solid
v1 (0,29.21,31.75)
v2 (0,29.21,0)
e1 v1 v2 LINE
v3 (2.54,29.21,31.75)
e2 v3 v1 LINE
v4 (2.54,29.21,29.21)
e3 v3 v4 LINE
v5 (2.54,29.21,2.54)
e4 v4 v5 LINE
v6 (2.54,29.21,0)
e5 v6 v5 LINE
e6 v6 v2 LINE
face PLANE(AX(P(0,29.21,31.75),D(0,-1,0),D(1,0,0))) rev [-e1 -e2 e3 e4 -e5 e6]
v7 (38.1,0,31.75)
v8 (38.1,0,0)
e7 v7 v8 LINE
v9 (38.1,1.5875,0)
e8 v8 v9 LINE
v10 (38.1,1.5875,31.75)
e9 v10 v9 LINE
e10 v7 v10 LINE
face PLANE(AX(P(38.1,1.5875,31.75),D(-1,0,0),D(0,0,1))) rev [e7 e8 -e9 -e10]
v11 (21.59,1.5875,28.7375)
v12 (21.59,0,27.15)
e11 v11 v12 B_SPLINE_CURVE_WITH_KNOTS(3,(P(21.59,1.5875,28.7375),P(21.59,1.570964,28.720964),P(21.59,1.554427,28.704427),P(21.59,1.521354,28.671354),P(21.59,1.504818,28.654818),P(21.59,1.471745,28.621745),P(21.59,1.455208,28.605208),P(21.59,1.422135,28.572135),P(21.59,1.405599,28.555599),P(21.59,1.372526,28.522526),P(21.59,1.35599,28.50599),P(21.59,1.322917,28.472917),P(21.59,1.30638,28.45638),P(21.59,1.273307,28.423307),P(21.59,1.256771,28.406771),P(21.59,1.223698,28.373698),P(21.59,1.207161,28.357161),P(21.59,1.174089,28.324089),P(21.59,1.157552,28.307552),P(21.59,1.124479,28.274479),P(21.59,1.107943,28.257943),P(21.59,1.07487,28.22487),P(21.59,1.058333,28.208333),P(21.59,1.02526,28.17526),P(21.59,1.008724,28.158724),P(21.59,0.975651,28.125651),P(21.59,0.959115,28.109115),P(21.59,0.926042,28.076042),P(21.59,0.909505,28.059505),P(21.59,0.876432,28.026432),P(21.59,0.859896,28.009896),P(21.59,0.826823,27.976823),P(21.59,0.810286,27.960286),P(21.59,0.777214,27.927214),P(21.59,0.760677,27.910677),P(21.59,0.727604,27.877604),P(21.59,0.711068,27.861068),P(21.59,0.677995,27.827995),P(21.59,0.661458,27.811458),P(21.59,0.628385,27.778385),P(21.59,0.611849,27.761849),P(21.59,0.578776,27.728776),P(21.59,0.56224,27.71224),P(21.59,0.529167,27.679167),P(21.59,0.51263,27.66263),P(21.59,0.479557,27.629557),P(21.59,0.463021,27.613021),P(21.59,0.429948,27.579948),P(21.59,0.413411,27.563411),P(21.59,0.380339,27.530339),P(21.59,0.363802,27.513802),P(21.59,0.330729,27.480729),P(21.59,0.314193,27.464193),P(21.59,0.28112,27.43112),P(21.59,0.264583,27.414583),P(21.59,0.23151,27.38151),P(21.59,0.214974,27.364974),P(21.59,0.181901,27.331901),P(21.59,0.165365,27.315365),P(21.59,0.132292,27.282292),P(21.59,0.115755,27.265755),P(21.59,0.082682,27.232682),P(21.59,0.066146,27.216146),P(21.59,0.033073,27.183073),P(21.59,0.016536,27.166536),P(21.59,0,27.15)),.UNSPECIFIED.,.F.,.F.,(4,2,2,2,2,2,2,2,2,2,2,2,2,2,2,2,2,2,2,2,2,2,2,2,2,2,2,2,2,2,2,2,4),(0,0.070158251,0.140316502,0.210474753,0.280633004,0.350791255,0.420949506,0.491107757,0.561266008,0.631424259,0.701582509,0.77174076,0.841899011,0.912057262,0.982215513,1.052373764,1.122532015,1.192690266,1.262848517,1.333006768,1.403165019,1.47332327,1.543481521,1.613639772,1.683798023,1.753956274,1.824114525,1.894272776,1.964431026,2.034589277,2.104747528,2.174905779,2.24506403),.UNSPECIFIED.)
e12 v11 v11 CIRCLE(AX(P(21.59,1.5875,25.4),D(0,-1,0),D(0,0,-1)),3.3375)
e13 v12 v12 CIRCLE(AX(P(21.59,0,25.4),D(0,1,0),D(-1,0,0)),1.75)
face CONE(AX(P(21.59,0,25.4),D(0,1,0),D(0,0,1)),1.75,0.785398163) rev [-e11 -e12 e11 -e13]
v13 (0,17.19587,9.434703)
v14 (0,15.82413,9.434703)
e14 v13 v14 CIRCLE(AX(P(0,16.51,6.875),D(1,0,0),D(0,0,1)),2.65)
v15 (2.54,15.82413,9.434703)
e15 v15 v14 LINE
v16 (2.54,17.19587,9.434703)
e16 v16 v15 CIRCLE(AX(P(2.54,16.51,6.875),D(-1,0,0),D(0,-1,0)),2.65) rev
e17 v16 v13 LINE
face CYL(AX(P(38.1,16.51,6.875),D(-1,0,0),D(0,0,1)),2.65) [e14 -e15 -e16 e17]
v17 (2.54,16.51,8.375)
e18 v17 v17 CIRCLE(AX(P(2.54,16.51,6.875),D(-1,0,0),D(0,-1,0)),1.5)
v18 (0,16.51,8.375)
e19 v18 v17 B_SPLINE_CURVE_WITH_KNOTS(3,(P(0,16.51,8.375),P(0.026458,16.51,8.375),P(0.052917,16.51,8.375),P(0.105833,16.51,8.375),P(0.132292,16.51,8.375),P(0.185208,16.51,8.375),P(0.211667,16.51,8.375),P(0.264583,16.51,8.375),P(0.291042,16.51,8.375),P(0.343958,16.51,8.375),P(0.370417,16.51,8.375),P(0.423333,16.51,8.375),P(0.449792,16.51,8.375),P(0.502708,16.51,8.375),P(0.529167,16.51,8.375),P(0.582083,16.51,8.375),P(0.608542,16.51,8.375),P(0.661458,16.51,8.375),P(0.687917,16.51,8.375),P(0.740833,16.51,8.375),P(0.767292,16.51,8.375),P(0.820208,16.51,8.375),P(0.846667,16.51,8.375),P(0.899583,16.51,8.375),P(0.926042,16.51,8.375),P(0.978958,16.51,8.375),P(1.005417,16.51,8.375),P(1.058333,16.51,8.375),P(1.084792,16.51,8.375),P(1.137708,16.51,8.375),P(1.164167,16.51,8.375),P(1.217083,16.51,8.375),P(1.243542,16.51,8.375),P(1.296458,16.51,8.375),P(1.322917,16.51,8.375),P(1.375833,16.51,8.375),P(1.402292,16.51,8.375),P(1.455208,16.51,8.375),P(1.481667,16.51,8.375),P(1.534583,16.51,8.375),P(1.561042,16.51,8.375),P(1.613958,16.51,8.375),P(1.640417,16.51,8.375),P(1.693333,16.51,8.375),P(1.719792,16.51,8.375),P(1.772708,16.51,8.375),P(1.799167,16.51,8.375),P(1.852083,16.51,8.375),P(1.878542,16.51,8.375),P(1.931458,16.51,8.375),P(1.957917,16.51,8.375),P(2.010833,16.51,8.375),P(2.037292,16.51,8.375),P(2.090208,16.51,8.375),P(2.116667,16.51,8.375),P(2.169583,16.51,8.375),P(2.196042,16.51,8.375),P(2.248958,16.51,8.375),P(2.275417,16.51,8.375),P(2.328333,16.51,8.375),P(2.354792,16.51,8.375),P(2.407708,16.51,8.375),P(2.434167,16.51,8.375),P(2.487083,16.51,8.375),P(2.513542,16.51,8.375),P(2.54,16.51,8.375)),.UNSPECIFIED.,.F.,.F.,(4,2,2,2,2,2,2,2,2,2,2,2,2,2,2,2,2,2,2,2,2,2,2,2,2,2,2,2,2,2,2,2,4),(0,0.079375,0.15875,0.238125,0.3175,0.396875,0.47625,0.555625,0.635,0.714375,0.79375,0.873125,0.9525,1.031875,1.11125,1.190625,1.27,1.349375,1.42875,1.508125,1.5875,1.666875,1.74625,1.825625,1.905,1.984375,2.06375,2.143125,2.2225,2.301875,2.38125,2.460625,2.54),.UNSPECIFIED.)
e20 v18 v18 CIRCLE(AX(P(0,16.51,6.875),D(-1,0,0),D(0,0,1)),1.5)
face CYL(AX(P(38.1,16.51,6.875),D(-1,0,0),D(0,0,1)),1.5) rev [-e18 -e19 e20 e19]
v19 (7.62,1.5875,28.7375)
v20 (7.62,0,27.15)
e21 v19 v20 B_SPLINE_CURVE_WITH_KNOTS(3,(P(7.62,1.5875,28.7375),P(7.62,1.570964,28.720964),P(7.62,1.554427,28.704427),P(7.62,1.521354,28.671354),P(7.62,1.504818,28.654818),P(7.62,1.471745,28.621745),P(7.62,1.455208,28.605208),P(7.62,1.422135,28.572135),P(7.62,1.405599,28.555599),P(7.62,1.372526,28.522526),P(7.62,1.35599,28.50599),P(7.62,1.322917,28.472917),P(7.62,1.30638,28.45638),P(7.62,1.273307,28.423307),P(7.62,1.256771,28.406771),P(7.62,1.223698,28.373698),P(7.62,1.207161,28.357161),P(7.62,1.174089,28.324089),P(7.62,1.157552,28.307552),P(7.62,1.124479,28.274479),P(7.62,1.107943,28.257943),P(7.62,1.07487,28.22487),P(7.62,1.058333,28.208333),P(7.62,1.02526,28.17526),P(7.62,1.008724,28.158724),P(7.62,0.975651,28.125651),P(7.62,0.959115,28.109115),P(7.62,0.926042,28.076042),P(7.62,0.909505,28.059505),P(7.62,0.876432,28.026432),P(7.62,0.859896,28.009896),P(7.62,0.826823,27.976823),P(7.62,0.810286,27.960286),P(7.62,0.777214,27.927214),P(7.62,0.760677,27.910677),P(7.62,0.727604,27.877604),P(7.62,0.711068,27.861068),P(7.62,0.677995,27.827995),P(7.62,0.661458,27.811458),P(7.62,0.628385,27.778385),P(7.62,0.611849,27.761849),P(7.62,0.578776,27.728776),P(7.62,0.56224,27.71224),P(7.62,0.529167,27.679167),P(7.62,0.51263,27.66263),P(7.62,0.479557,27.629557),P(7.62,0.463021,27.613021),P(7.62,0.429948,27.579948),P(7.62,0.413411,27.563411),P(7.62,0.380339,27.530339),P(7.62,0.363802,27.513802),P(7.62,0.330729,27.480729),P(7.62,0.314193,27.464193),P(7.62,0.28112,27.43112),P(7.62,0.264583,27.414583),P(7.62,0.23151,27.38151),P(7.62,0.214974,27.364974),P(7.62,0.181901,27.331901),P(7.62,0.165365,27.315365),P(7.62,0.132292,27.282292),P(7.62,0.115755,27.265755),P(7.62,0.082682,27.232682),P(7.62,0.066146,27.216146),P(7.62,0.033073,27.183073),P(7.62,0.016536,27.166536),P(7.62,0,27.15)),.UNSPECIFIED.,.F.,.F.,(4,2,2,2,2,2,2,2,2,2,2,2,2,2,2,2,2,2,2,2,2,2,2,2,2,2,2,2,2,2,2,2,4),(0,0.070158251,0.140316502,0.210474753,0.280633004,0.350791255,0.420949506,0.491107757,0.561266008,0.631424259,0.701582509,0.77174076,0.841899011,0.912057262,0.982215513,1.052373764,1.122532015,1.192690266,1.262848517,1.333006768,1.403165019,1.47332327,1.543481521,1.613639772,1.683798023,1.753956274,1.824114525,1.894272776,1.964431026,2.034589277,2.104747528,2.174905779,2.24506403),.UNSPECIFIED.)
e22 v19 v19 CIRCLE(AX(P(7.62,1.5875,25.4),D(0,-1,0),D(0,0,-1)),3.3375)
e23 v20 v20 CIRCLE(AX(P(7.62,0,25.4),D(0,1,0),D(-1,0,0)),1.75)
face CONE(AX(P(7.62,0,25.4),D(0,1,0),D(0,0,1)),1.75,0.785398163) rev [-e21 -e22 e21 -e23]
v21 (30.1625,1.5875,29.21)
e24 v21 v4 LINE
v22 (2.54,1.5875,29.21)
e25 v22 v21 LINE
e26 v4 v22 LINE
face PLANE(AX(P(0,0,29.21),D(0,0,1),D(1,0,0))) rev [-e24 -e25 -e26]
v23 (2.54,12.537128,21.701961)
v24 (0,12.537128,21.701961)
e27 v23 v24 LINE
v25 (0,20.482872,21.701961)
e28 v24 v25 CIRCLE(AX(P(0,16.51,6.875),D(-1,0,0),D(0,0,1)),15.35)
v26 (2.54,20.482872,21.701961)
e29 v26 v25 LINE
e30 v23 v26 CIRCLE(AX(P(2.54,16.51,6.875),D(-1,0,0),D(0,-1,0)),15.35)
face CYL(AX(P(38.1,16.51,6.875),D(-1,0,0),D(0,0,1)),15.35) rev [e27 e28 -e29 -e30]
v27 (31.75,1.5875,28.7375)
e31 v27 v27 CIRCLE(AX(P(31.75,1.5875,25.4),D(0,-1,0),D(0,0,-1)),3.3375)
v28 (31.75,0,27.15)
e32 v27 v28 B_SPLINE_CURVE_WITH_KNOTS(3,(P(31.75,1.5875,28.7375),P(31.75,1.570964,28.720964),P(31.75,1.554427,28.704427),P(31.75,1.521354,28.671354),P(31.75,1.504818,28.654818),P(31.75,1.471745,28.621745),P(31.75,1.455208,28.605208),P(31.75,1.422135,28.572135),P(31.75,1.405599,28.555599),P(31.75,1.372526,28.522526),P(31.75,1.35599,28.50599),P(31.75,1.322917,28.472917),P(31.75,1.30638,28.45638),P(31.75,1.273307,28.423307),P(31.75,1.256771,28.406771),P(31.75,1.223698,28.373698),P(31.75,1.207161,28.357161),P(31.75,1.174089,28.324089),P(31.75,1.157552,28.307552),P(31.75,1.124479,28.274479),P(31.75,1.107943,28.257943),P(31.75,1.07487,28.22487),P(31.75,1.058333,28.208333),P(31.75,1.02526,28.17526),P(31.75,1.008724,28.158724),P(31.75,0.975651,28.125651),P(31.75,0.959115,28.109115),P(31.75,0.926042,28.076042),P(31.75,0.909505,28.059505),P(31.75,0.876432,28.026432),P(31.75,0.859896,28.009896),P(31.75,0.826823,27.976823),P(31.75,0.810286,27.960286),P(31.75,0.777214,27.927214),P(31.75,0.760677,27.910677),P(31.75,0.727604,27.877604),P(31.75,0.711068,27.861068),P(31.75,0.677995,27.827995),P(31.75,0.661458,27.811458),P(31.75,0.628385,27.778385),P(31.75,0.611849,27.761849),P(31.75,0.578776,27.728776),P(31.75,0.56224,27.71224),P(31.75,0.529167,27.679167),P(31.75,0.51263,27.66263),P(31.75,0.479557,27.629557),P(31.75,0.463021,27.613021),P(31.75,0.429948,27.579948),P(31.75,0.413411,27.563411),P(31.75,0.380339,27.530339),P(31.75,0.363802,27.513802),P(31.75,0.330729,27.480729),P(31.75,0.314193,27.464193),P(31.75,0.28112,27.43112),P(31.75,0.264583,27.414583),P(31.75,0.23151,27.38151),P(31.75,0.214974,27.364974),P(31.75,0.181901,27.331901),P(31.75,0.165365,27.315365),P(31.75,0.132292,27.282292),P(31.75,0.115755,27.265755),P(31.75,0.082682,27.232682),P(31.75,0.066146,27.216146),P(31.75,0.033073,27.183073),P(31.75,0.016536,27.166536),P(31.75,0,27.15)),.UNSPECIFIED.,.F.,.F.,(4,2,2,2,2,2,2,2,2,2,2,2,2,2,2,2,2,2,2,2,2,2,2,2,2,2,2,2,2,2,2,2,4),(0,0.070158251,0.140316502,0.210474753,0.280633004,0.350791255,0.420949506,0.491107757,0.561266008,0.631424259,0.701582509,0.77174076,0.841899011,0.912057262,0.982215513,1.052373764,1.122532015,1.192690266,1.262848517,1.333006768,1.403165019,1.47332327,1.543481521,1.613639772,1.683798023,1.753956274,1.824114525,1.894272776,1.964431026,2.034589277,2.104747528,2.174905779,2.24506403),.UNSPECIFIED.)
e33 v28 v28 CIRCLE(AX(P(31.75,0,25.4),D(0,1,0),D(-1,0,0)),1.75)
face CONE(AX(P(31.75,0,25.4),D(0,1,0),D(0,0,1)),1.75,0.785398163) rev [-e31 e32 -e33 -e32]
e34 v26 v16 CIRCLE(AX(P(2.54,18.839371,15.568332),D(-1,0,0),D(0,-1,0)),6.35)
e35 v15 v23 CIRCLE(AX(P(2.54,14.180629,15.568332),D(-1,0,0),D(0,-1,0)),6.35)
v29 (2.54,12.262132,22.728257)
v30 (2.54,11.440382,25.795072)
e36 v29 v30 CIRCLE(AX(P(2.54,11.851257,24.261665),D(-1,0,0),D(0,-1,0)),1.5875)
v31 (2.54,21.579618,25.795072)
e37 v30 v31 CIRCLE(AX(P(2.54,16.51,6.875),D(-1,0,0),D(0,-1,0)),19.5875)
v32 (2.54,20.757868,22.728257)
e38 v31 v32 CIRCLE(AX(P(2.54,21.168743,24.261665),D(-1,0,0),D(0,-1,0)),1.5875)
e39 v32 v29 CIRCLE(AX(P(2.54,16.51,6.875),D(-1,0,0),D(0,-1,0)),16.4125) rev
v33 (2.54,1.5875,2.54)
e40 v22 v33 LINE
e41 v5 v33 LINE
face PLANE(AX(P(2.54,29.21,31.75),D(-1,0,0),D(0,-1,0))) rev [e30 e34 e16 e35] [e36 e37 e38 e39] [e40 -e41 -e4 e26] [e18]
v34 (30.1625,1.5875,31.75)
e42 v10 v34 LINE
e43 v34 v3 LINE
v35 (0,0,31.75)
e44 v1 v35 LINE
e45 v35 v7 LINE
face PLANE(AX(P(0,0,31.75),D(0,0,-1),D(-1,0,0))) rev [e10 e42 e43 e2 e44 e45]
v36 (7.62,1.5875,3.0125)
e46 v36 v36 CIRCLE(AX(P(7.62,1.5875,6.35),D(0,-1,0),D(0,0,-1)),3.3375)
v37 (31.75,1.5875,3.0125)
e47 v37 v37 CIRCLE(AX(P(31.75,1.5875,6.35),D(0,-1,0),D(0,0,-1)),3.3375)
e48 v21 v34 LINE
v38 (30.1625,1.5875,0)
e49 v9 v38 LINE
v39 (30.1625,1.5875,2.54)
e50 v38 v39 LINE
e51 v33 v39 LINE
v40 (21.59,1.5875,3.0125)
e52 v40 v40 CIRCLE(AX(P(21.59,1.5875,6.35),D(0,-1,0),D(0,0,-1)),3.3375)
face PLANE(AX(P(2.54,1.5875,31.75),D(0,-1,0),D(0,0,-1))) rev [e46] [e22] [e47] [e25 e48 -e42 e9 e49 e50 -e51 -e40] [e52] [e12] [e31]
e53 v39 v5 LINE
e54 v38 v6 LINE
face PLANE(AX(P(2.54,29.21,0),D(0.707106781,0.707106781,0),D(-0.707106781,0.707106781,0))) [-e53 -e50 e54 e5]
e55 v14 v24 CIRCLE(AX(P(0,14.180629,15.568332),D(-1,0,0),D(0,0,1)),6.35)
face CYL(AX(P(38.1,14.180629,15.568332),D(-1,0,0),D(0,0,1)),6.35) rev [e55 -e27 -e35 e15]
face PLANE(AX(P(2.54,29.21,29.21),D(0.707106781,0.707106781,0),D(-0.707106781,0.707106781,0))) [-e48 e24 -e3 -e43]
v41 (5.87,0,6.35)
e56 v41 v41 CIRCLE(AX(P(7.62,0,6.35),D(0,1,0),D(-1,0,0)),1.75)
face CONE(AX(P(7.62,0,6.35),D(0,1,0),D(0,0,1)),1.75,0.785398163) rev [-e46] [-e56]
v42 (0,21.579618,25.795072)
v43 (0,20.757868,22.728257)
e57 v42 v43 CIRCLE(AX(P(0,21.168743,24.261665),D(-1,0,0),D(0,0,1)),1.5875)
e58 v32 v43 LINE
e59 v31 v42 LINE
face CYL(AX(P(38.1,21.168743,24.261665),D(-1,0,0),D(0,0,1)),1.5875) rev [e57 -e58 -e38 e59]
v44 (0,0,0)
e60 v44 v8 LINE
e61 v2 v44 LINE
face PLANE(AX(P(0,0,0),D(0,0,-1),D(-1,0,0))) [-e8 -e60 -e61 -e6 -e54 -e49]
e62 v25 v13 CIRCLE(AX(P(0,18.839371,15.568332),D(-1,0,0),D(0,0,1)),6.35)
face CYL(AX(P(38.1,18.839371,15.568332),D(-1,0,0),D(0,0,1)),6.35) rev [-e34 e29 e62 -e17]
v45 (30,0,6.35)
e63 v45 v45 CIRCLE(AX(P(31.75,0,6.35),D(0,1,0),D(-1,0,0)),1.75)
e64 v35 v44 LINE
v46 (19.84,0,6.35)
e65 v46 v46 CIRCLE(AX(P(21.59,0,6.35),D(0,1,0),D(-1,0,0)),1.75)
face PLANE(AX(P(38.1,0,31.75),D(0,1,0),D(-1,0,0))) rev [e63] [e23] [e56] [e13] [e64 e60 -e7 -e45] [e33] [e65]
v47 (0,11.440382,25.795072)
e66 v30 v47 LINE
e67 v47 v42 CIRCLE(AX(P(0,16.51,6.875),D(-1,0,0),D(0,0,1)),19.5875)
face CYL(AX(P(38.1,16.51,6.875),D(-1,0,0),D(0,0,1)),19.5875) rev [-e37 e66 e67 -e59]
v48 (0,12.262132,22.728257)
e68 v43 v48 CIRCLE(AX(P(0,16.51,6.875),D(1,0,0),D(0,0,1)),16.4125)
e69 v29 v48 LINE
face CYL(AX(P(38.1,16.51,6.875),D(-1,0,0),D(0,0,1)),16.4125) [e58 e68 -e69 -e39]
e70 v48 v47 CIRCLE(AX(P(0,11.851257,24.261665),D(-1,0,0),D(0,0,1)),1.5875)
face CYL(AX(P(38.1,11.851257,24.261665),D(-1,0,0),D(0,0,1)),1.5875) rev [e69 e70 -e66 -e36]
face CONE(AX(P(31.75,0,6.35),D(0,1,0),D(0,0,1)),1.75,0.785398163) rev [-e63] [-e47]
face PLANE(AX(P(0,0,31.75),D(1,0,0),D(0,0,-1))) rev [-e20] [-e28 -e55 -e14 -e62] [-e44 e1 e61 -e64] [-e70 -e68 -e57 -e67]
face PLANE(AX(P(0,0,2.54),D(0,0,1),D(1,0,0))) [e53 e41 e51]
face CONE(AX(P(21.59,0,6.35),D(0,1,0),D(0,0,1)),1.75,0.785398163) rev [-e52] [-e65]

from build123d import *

# Parameters (mm, degrees)
BOSS_EXTRUDE1_DEPTH = 31.75
SKETCH2_R           = 6.35
CUT_EXTRUDE1_DEPTH  = 58.557767504
SKETCH3_R           = 1.5
CUT_EXTRUDE2_DEPTH  = 58.557767504
BOSS_EXTRUDE2_DEPTH = 2.54
BOSS_EXTRUDE3_START = -29.21
BOSS_EXTRUDE3_DEPTH = 2.54
SKETCH5_R           = 1.75
CUT_EXTRUDE3_DEPTH  = 2.54
CHAMFER1_SIZE       = 1.5875


with BuildPart() as part:
    # Sketch1 → Boss-Extrude1 (new body)
    with BuildSketch(Plane.XY):
        Polygon((0, 0), (0, 29.21), (2.54, 29.21), (2.54, 1.5875), (38.1, 1.5875), (38.1, 0), align=None)
    extrude(amount=BOSS_EXTRUDE1_DEPTH)

    # Sketch2 → Cut-Extrude1 (cut, through all)
    with BuildSketch(Plane.ZY):
        with Locations((15.875, 16.51)):
            Circle(SKETCH2_R)
    extrude(amount=-CUT_EXTRUDE1_DEPTH, mode=Mode.SUBTRACT)

    # Sketch3 → Cut-Extrude2 (cut, through all)
    with BuildSketch(Plane.ZY):
        with Locations((6.875, 16.51)):
            Circle(SKETCH3_R)
        with BuildLine():
            ThreePointArc((21.701961434, 12.537127658), (22.225, 16.51), (21.701961434, 20.482872342))
            ThreePointArc((21.701961434, 20.482872342), (13.9248315, 24.973000403), (9.43470344, 17.19587047))
            ThreePointArc((9.43470344, 17.19587047), (9.525, 16.51), (9.43470344, 15.82412953))
            ThreePointArc((9.43470344, 15.82412953), (13.9248315, 8.046999597), (21.701961434, 12.537127658))
        make_face()
        with BuildLine():
            ThreePointArc((25.79507191, 11.440382011), (26.46249978, 16.51), (25.79507191, 21.579617989))
            ThreePointArc((25.79507191, 21.579617989), (23.850789427, 22.702150004), (22.728257411, 20.757867521))
            ThreePointArc((22.728257411, 20.757867521), (23.28749978, 16.51), (22.728257411, 12.262132479))
            ThreePointArc((22.728257411, 12.262132479), (23.850789427, 10.317849996), (25.79507191, 11.440382011))
        make_face()
    extrude(amount=-CUT_EXTRUDE2_DEPTH, mode=Mode.SUBTRACT)

    # Sketch4 → Boss-Extrude2 (add)
    with BuildSketch(Plane.XY.offset(31.75)):
        Polygon((2.54, 29.21), (30.1625, 1.5875), (2.54, 1.5875), align=None)
    extrude(amount=-BOSS_EXTRUDE2_DEPTH)

    # Sketch4<2> → Boss-Extrude3 (add)
    with BuildSketch(Plane.XY.offset(31.75).offset(BOSS_EXTRUDE3_START)):
        Polygon((2.54, 29.21), (30.1625, 1.5875), (2.54, 1.5875), align=None)
    extrude(amount=-BOSS_EXTRUDE3_DEPTH)

    # Sketch5 → Cut-Extrude3 (cut)
    with BuildSketch(Plane(origin=(0, 1.5875, 0), x_dir=(1, 0, 0), z_dir=(0, 1, 0))):
        with Locations(Location((7.62, -6.35, 0), (0, 0, 270))):
            Circle(SKETCH5_R)
        with Locations(Location((31.75, -25.4, 0), (0, 0, 270))):
            Circle(SKETCH5_R)
        with Locations(Location((31.75, -6.35, 0), (0, 0, 270))):
            Circle(SKETCH5_R)
        with Locations(Location((7.62, -25.4, 0), (0, 0, 270))):
            Circle(SKETCH5_R)
        with Locations(Location((21.59, -6.35, 0), (0, 0, 270))):
            Circle(SKETCH5_R)
        with Locations(Location((21.59, -25.4, 0), (0, 0, 270))):
            Circle(SKETCH5_R)
    extrude(amount=-CUT_EXTRUDE3_DEPTH, mode=Mode.SUBTRACT)

    # Chamfer1
    chamfer1_edges = [part.edges().sort_by_distance(p)[0] for p in [
        (31.75, 1.5875, 23.65),
        (31.75, 1.5875, 4.6),
        (7.62, 1.5875, 23.65),
        (21.59, 1.5875, 23.65),
        (21.59, 1.5875, 4.6),
        (7.62, 1.5875, 4.6),
    ]]
    chamfer(chamfer1_edges, length=CHAMFER1_SIZE - 0.0001)  # a hair under: the kernel refuses the full size


solid = part.part
